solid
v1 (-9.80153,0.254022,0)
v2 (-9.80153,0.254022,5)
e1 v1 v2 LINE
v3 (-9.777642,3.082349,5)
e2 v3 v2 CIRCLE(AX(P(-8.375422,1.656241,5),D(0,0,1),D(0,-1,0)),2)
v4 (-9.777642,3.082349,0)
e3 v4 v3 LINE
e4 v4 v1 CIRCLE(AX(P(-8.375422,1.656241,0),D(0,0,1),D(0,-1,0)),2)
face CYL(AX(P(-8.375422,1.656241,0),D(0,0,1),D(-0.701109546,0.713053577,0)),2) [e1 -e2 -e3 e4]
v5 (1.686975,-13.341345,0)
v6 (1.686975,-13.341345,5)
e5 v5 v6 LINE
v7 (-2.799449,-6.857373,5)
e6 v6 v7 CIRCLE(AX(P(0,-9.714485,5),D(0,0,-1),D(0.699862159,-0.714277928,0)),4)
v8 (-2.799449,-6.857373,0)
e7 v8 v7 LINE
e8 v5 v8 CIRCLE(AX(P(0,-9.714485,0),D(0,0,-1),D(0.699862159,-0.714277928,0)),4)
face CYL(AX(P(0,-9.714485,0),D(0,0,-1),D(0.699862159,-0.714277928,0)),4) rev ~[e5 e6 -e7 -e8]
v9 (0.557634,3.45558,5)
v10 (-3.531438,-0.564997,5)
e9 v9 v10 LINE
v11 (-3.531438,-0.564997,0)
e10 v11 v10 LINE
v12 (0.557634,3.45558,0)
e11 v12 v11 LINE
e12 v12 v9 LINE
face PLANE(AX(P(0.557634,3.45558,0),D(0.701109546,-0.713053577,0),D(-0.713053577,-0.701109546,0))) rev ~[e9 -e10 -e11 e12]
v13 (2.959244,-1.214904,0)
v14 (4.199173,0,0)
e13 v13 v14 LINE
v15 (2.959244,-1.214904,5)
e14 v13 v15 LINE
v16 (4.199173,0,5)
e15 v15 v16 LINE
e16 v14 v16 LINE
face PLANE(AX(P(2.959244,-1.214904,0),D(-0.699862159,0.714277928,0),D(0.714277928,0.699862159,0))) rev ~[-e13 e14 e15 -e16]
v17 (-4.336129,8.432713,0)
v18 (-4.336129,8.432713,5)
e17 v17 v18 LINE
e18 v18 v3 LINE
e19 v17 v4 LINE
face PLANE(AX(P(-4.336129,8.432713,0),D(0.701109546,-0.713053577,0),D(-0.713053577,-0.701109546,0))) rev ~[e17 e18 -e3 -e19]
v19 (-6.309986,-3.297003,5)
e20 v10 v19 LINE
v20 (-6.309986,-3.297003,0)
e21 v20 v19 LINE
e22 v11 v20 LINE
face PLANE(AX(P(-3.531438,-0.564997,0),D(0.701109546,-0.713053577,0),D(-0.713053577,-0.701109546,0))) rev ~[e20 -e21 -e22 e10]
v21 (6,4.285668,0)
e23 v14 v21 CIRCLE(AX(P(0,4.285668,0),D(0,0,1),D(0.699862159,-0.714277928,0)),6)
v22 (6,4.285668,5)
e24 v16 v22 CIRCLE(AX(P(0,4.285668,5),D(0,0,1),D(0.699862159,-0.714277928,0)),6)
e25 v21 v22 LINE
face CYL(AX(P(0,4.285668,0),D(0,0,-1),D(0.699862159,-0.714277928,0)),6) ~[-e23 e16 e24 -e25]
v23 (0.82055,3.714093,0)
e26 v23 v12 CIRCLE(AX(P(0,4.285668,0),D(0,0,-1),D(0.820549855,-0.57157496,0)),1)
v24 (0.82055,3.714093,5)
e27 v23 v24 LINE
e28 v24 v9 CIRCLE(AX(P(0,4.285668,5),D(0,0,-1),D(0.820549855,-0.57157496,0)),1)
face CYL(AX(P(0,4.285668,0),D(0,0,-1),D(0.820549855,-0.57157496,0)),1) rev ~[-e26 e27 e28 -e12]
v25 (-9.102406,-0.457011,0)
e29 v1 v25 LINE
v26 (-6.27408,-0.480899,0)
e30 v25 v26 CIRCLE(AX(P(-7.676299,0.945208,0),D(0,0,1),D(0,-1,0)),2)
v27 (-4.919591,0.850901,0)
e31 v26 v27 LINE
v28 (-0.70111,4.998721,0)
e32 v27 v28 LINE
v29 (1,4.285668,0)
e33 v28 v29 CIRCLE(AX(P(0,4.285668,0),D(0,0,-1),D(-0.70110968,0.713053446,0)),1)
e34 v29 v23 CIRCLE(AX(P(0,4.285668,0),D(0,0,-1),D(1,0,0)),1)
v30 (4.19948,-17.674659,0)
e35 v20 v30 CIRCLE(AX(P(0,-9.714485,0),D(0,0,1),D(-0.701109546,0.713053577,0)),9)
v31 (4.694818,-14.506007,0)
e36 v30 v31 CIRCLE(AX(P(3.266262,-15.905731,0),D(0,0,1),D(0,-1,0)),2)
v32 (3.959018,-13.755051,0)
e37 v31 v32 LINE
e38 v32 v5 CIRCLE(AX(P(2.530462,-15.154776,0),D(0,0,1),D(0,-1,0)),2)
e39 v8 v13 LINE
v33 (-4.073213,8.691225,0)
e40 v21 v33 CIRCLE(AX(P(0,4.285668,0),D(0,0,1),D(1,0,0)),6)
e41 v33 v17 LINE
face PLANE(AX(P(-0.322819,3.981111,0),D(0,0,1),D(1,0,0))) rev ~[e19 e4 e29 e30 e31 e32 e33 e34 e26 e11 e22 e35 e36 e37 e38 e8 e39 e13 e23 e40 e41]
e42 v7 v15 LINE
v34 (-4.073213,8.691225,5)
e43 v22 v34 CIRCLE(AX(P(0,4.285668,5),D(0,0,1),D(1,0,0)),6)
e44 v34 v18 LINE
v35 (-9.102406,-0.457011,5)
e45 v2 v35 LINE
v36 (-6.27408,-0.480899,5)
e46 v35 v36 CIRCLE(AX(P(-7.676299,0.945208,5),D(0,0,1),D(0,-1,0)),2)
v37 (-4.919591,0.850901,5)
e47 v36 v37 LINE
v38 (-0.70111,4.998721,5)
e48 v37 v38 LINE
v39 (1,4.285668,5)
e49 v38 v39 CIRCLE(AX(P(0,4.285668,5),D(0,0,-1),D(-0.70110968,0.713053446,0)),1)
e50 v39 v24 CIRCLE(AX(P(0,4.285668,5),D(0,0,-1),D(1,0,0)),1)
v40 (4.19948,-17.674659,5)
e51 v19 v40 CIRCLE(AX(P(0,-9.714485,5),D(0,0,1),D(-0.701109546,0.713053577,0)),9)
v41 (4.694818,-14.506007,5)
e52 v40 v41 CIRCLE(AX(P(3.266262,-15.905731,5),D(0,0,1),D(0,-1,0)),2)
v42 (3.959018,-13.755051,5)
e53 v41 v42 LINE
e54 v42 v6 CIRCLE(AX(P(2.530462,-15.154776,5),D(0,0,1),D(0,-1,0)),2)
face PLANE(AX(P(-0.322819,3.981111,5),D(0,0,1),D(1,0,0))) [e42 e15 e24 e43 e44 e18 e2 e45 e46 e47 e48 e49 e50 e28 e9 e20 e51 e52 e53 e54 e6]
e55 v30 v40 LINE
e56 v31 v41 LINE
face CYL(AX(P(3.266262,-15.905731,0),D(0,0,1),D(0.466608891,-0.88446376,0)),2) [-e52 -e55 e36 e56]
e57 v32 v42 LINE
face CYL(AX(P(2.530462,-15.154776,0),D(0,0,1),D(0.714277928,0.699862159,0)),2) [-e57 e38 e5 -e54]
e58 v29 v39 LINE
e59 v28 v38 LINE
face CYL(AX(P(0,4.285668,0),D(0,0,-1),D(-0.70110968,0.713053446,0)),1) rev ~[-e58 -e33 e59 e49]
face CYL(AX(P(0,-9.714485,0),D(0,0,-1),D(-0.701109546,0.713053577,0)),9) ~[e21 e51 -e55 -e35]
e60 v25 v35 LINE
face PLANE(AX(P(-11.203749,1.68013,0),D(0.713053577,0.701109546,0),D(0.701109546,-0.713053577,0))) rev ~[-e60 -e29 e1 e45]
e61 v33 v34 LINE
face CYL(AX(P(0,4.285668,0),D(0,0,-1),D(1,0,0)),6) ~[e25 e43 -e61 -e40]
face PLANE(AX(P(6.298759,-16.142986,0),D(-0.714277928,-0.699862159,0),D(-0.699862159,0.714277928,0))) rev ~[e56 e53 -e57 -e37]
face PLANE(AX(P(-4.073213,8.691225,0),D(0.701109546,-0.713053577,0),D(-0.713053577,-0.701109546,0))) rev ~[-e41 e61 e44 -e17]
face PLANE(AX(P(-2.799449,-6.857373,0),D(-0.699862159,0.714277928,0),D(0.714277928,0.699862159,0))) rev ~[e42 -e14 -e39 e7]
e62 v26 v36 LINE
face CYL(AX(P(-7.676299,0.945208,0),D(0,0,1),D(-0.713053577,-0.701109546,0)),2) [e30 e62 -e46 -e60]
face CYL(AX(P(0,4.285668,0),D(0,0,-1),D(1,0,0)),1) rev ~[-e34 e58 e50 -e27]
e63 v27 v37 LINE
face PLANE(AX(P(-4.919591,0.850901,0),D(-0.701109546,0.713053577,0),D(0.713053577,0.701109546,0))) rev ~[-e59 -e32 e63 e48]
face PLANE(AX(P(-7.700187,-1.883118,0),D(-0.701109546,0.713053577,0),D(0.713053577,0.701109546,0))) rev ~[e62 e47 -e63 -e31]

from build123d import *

# Parameters (mm, degrees)
F1_DEPTH = 5
F3_R     = 2


# Not quite as in the source:
# - a feature of the source that left no trace in its solid (it failed there, or was rolled back) is left out
# - a feature names something its author has since deleted; it is built from what else it names


with BuildPart() as f1:
    # F0 (on Top) → F1 (new body)
    with BuildSketch(Plane.XY):
        with BuildLine():
            ThreePointArc((1, 4.2856675661), (0.9540832917, 3.9861261291), (0.820549855, 3.7140926057))
            ThreePointArc((0.820549855, 3.7140926057), (0.7011095464, 3.5726139889), (0.5576336696, 3.4555804077))
            Line((0.5576336696, 3.4555804077), (-3.5314378692, -0.5649969839))
            ThreePointArc((-3.5314378692, -0.5649969839), (-3.0925503087, -0.8559404108), (-2.6298440658, -1.1072834062))
            ThreePointArc((-2.6298440658, -1.1072834062), (0, -0.714485053), (2.6298440658, -1.1072834062))
            ThreePointArc((2.6298440658, -1.1072834062), (3.4591021242, -0.6168432696), (4.1991729558, 0))
            ThreePointArc((4.1991729558, 0), (5.531502406, 1.961343765), (6, 4.2856675661))
            ThreePointArc((6, 4.2856675661), (2.4042381835, 9.7829067602), (-4.073212919, 8.6912250242))
            Line((-4.073212919, 8.6912250242), (-4.3361291045, 8.4327128262))
            ThreePointArc((-4.3361291045, 8.4327128262), (-5.9823120662, 4.7460395278), (-4.9195913989, 0.8509011303))
            Line((-4.9195913989, 0.8509011303), (-0.7011096797, 4.9987210123))
            ThreePointArc((-0.7011096797, 4.9987210123), (0.3865813759, 5.2079228669), (1, 4.2856675661))
        make_face()
        with BuildLine():
            ThreePointArc((-2.6298440658, -1.1072834062), (-3.0925503087, -0.8559404108), (-3.5314378692, -0.5649969839))
            Line((-3.5314378692, -0.5649969839), (-6.3099859173, -3.297002858))
            ThreePointArc((-6.3099859173, -3.297002858), (-4.6020493099, -1.9800722021), (-2.6298440658, -1.1072834062))
        make_face()
        with BuildLine():
            Line((-7.7001872259, -1.8831182213), (-4.9195913989, 0.8509011303))
            ThreePointArc((-4.9195913989, 0.8509011303), (-5.9823120662, 4.7460395278), (-4.3361291045, 8.4327128262))
            Line((-4.3361291045, 8.4327128262), (-11.2037486913, 1.6801295606))
            Line((-11.2037486913, 1.6801295606), (-7.7001872259, -1.8831182213))
        make_face()
        with BuildLine():
            ThreePointArc((2.6298440658, -1.1072834062), (0, -0.714485053), (-2.6298440658, -1.1072834062))
            ThreePointArc((-2.6298440658, -1.1072834062), (0, -1.7143324339), (2.6298440658, -1.1072834062))
        make_face()
        with BuildLine():
            ThreePointArc((2.6298440658, -1.1072834062), (0, -1.7143324339), (-2.6298440658, -1.1072834062))
            ThreePointArc((-2.6298440658, -1.1072834062), (-4.6020493099, -1.9800722021), (-6.3099859173, -3.297002858))
            ThreePointArc((-6.3099859173, -3.297002858), (-6.4229942249, -16.018860136), (6.2987594337, -16.1429864022))
            Line((6.2987594337, -16.1429864022), (2.7994486372, -12.5715967638))
            ThreePointArc((2.7994486372, -12.5715967638), (-2.8571117107, -12.5139336903), (-2.7994486372, -6.8573733423))
            Line((-2.7994486372, -6.8573733423), (2.9592441197, -1.2149042257))
            ThreePointArc((2.9592441197, -1.2149042257), (2.7950621185, -1.1595082703), (2.6298440658, -1.1072834062))
        make_face()
        with BuildLine():
            ThreePointArc((4.1991729558, 0), (3.4591021242, -0.6168432696), (2.6298440658, -1.1072834062))
            ThreePointArc((2.6298440658, -1.1072834062), (2.7950621185, -1.1595082703), (2.9592441197, -1.2149042257))
            Line((2.9592441197, -1.2149042257), (4.1991729558, 0))
        make_face()
    extrude(amount=F1_DEPTH)

    # F3
    f3_edges = [f1.edges().sort_by_distance(p)[0] for p in [
        (-11.203749, 1.68013, 2.5),
        (-7.700187, -1.883118, 2.5),
        (6.298759, -16.142986, 2.5),
        (2.799449, -12.571597, 2.5),
    ]]
    fillet(f3_edges, radius=F3_R)


solid = f1.part
